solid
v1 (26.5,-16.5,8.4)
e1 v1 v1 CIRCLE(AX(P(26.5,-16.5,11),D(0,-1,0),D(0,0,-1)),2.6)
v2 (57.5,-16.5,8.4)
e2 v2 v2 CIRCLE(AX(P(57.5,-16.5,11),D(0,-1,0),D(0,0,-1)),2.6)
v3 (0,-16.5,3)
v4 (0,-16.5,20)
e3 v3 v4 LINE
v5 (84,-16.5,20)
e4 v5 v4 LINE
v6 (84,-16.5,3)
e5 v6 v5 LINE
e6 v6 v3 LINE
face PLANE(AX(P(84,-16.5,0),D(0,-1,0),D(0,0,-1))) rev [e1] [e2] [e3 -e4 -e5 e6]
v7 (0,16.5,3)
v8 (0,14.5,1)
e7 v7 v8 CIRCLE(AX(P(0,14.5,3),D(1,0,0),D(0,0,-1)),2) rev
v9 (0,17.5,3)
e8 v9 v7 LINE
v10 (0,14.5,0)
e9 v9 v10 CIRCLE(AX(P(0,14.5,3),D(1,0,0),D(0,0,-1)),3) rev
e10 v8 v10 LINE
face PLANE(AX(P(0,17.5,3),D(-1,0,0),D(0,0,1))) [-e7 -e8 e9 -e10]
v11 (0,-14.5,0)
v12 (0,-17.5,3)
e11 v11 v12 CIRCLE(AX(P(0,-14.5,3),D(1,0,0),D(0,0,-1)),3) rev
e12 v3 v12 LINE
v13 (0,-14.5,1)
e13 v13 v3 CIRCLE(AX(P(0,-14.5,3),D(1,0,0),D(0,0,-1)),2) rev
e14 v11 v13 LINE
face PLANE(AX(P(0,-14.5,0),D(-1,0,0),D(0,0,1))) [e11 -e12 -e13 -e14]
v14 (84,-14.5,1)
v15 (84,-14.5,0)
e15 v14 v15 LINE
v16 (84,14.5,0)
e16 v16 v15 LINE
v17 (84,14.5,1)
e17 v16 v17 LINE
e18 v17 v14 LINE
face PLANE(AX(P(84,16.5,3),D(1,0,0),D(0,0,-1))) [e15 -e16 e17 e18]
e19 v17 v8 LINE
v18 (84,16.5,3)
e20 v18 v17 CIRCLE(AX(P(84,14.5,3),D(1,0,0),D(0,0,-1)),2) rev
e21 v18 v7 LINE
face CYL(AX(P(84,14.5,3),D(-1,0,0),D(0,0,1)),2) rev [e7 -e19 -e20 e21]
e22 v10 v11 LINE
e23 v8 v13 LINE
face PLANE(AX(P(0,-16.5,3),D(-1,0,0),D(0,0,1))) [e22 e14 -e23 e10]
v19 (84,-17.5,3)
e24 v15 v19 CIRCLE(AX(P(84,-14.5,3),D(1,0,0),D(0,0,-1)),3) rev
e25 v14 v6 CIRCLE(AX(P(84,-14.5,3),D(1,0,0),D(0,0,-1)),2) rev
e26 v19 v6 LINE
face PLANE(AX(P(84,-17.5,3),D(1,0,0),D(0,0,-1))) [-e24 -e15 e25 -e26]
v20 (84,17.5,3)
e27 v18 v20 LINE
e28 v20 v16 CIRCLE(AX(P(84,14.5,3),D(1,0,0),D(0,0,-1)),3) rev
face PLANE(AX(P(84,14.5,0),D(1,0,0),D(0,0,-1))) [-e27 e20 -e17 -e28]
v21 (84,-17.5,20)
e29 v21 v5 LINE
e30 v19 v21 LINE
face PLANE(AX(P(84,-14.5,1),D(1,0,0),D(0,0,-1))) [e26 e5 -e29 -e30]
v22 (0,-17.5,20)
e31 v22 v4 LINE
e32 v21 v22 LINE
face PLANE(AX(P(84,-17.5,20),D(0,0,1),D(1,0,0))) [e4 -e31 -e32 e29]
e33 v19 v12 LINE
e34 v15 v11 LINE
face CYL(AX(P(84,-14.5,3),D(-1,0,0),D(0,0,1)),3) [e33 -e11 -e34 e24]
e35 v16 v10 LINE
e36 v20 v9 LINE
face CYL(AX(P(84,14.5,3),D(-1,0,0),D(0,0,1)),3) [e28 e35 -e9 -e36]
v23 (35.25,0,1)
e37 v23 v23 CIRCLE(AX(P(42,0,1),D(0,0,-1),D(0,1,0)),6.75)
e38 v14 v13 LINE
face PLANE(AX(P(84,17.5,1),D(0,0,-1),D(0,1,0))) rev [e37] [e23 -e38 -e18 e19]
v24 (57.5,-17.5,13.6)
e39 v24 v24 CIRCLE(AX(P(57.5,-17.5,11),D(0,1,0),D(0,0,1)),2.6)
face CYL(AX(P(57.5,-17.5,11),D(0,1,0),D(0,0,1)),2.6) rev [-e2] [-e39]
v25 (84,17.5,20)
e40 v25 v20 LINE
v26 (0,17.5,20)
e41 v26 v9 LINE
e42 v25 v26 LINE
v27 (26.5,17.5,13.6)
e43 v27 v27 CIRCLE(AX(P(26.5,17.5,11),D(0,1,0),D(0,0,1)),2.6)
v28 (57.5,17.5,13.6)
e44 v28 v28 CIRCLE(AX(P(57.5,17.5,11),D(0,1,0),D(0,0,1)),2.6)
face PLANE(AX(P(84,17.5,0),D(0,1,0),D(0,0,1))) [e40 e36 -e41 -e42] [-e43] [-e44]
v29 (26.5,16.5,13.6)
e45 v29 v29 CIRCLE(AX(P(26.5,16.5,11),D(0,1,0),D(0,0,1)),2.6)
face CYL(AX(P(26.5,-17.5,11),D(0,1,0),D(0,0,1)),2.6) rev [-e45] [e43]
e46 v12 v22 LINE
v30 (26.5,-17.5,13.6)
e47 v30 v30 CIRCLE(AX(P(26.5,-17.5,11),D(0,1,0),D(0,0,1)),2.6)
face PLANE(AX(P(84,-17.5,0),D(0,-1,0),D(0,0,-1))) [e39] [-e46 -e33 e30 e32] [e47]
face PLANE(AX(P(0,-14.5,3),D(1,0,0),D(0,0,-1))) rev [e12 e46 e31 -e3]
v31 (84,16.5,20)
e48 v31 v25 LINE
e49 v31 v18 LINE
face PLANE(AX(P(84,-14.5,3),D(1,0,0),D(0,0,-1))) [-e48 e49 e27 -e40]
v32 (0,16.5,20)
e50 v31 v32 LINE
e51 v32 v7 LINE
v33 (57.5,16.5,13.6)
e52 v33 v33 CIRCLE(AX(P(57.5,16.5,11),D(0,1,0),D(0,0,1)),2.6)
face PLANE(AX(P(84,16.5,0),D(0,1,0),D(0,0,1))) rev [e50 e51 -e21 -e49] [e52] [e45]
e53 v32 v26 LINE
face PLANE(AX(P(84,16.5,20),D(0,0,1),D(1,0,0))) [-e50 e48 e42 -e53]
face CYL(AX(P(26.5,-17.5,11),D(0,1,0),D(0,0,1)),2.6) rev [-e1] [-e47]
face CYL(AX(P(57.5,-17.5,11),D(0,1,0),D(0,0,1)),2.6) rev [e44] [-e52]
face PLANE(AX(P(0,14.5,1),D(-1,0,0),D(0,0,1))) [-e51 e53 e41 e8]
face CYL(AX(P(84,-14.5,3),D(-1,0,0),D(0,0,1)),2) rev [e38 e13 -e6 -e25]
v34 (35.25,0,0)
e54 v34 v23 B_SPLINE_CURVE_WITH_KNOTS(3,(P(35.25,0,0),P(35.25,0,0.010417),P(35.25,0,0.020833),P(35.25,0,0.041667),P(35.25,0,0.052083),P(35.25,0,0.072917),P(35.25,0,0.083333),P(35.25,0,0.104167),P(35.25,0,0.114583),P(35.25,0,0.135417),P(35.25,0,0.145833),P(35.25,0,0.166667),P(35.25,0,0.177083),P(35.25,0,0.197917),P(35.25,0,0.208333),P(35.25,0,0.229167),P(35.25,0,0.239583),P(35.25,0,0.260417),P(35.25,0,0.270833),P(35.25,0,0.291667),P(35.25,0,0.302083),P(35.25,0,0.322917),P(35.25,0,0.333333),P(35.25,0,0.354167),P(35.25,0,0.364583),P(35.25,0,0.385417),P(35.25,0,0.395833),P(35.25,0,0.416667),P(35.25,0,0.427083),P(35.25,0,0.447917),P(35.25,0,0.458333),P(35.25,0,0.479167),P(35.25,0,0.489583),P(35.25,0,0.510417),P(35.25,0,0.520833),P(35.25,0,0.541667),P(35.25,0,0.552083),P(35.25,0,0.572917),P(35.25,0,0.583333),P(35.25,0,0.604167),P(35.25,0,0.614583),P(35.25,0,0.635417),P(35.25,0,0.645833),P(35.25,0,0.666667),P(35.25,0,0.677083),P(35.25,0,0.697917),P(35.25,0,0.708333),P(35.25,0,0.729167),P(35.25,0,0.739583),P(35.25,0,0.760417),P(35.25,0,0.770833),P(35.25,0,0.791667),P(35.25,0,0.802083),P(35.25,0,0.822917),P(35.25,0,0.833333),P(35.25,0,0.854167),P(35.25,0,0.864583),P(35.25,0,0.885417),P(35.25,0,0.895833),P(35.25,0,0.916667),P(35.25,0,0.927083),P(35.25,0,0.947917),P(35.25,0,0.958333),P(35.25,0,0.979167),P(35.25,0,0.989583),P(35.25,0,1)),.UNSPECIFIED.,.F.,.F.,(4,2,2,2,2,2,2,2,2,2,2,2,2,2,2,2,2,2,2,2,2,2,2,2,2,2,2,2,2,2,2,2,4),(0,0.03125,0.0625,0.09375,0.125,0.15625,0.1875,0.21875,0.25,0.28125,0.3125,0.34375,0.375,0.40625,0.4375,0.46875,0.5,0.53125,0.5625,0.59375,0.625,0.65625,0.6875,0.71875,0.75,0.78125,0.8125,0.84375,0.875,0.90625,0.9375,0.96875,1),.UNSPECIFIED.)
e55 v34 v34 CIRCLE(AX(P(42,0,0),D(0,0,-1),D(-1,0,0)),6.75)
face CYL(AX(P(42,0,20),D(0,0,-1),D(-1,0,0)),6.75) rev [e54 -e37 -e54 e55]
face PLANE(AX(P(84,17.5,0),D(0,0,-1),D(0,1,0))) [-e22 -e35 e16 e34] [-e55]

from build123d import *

# Parameters (mm, degrees)
BASE_FLANGE1_DEPTH = 84
SKETCH14_R         = 2.6
CUT_EXTRUDE1_DEPTH = 94.171884171
SKETCH15_R         = 6.75
CUT_EXTRUDE2_DEPTH = 89.103632161


# Sheet-metal steps are written as plain solids
with BuildPart() as part:
    # Sketch3 → Base-Flange1 (new body)
    with BuildSketch(Plane(origin=(0, 0, 0), x_dir=(0, 0, -1), z_dir=(1, 0, 0))):
        with BuildLine():
            Line((-20, 17.5), (-3, 17.5))
            ThreePointArc((-3, 17.5), (-0.878679656, 16.621320344), (0, 14.5))
            Line((0, 14.5), (0, -14.5))
            ThreePointArc((0, -14.5), (-0.878679656, -16.621320344), (-3, -17.5))
            Line((-3, -17.5), (-20, -17.5))
            Line((-20, -17.5), (-20, -16.5))
            Line((-20, -16.5), (-3, -16.5))
            ThreePointArc((-3, -16.5), (-1.585786438, -15.914213562), (-1, -14.5))
            Line((-1, -14.5), (-1, 14.5))
            ThreePointArc((-1, 14.5), (-1.585786438, 15.914213562), (-3, 16.5))
            Line((-3, 16.5), (-20, 16.5))
            Line((-20, 16.5), (-20, 17.5))
        make_face()
    extrude(amount=BASE_FLANGE1_DEPTH)

    # Sketch14 → Cut-Extrude1 (cut, through all)
    with BuildSketch(Plane(origin=(0, 17.5, 0), x_dir=(1, 0, 0), z_dir=(0, 1, 0))):
        with Locations(Location((26.5, -11, 0), (0, 0, 270))):
            Circle(SKETCH14_R)
        with Locations(Location((57.5, -11, 0), (0, 0, 270))):
            Circle(SKETCH14_R)
    extrude(amount=-CUT_EXTRUDE1_DEPTH, mode=Mode.SUBTRACT)

    # Sketch15 → Cut-Extrude2 (cut, through all)
    with BuildSketch(Plane(origin=(0, 0, 0), x_dir=(-1, 0, 0), z_dir=(0, 0, -1))):
        with Locations((-42, 0)):
            Circle(SKETCH15_R)
    extrude(amount=-CUT_EXTRUDE2_DEPTH, mode=Mode.SUBTRACT)


solid = part.part
